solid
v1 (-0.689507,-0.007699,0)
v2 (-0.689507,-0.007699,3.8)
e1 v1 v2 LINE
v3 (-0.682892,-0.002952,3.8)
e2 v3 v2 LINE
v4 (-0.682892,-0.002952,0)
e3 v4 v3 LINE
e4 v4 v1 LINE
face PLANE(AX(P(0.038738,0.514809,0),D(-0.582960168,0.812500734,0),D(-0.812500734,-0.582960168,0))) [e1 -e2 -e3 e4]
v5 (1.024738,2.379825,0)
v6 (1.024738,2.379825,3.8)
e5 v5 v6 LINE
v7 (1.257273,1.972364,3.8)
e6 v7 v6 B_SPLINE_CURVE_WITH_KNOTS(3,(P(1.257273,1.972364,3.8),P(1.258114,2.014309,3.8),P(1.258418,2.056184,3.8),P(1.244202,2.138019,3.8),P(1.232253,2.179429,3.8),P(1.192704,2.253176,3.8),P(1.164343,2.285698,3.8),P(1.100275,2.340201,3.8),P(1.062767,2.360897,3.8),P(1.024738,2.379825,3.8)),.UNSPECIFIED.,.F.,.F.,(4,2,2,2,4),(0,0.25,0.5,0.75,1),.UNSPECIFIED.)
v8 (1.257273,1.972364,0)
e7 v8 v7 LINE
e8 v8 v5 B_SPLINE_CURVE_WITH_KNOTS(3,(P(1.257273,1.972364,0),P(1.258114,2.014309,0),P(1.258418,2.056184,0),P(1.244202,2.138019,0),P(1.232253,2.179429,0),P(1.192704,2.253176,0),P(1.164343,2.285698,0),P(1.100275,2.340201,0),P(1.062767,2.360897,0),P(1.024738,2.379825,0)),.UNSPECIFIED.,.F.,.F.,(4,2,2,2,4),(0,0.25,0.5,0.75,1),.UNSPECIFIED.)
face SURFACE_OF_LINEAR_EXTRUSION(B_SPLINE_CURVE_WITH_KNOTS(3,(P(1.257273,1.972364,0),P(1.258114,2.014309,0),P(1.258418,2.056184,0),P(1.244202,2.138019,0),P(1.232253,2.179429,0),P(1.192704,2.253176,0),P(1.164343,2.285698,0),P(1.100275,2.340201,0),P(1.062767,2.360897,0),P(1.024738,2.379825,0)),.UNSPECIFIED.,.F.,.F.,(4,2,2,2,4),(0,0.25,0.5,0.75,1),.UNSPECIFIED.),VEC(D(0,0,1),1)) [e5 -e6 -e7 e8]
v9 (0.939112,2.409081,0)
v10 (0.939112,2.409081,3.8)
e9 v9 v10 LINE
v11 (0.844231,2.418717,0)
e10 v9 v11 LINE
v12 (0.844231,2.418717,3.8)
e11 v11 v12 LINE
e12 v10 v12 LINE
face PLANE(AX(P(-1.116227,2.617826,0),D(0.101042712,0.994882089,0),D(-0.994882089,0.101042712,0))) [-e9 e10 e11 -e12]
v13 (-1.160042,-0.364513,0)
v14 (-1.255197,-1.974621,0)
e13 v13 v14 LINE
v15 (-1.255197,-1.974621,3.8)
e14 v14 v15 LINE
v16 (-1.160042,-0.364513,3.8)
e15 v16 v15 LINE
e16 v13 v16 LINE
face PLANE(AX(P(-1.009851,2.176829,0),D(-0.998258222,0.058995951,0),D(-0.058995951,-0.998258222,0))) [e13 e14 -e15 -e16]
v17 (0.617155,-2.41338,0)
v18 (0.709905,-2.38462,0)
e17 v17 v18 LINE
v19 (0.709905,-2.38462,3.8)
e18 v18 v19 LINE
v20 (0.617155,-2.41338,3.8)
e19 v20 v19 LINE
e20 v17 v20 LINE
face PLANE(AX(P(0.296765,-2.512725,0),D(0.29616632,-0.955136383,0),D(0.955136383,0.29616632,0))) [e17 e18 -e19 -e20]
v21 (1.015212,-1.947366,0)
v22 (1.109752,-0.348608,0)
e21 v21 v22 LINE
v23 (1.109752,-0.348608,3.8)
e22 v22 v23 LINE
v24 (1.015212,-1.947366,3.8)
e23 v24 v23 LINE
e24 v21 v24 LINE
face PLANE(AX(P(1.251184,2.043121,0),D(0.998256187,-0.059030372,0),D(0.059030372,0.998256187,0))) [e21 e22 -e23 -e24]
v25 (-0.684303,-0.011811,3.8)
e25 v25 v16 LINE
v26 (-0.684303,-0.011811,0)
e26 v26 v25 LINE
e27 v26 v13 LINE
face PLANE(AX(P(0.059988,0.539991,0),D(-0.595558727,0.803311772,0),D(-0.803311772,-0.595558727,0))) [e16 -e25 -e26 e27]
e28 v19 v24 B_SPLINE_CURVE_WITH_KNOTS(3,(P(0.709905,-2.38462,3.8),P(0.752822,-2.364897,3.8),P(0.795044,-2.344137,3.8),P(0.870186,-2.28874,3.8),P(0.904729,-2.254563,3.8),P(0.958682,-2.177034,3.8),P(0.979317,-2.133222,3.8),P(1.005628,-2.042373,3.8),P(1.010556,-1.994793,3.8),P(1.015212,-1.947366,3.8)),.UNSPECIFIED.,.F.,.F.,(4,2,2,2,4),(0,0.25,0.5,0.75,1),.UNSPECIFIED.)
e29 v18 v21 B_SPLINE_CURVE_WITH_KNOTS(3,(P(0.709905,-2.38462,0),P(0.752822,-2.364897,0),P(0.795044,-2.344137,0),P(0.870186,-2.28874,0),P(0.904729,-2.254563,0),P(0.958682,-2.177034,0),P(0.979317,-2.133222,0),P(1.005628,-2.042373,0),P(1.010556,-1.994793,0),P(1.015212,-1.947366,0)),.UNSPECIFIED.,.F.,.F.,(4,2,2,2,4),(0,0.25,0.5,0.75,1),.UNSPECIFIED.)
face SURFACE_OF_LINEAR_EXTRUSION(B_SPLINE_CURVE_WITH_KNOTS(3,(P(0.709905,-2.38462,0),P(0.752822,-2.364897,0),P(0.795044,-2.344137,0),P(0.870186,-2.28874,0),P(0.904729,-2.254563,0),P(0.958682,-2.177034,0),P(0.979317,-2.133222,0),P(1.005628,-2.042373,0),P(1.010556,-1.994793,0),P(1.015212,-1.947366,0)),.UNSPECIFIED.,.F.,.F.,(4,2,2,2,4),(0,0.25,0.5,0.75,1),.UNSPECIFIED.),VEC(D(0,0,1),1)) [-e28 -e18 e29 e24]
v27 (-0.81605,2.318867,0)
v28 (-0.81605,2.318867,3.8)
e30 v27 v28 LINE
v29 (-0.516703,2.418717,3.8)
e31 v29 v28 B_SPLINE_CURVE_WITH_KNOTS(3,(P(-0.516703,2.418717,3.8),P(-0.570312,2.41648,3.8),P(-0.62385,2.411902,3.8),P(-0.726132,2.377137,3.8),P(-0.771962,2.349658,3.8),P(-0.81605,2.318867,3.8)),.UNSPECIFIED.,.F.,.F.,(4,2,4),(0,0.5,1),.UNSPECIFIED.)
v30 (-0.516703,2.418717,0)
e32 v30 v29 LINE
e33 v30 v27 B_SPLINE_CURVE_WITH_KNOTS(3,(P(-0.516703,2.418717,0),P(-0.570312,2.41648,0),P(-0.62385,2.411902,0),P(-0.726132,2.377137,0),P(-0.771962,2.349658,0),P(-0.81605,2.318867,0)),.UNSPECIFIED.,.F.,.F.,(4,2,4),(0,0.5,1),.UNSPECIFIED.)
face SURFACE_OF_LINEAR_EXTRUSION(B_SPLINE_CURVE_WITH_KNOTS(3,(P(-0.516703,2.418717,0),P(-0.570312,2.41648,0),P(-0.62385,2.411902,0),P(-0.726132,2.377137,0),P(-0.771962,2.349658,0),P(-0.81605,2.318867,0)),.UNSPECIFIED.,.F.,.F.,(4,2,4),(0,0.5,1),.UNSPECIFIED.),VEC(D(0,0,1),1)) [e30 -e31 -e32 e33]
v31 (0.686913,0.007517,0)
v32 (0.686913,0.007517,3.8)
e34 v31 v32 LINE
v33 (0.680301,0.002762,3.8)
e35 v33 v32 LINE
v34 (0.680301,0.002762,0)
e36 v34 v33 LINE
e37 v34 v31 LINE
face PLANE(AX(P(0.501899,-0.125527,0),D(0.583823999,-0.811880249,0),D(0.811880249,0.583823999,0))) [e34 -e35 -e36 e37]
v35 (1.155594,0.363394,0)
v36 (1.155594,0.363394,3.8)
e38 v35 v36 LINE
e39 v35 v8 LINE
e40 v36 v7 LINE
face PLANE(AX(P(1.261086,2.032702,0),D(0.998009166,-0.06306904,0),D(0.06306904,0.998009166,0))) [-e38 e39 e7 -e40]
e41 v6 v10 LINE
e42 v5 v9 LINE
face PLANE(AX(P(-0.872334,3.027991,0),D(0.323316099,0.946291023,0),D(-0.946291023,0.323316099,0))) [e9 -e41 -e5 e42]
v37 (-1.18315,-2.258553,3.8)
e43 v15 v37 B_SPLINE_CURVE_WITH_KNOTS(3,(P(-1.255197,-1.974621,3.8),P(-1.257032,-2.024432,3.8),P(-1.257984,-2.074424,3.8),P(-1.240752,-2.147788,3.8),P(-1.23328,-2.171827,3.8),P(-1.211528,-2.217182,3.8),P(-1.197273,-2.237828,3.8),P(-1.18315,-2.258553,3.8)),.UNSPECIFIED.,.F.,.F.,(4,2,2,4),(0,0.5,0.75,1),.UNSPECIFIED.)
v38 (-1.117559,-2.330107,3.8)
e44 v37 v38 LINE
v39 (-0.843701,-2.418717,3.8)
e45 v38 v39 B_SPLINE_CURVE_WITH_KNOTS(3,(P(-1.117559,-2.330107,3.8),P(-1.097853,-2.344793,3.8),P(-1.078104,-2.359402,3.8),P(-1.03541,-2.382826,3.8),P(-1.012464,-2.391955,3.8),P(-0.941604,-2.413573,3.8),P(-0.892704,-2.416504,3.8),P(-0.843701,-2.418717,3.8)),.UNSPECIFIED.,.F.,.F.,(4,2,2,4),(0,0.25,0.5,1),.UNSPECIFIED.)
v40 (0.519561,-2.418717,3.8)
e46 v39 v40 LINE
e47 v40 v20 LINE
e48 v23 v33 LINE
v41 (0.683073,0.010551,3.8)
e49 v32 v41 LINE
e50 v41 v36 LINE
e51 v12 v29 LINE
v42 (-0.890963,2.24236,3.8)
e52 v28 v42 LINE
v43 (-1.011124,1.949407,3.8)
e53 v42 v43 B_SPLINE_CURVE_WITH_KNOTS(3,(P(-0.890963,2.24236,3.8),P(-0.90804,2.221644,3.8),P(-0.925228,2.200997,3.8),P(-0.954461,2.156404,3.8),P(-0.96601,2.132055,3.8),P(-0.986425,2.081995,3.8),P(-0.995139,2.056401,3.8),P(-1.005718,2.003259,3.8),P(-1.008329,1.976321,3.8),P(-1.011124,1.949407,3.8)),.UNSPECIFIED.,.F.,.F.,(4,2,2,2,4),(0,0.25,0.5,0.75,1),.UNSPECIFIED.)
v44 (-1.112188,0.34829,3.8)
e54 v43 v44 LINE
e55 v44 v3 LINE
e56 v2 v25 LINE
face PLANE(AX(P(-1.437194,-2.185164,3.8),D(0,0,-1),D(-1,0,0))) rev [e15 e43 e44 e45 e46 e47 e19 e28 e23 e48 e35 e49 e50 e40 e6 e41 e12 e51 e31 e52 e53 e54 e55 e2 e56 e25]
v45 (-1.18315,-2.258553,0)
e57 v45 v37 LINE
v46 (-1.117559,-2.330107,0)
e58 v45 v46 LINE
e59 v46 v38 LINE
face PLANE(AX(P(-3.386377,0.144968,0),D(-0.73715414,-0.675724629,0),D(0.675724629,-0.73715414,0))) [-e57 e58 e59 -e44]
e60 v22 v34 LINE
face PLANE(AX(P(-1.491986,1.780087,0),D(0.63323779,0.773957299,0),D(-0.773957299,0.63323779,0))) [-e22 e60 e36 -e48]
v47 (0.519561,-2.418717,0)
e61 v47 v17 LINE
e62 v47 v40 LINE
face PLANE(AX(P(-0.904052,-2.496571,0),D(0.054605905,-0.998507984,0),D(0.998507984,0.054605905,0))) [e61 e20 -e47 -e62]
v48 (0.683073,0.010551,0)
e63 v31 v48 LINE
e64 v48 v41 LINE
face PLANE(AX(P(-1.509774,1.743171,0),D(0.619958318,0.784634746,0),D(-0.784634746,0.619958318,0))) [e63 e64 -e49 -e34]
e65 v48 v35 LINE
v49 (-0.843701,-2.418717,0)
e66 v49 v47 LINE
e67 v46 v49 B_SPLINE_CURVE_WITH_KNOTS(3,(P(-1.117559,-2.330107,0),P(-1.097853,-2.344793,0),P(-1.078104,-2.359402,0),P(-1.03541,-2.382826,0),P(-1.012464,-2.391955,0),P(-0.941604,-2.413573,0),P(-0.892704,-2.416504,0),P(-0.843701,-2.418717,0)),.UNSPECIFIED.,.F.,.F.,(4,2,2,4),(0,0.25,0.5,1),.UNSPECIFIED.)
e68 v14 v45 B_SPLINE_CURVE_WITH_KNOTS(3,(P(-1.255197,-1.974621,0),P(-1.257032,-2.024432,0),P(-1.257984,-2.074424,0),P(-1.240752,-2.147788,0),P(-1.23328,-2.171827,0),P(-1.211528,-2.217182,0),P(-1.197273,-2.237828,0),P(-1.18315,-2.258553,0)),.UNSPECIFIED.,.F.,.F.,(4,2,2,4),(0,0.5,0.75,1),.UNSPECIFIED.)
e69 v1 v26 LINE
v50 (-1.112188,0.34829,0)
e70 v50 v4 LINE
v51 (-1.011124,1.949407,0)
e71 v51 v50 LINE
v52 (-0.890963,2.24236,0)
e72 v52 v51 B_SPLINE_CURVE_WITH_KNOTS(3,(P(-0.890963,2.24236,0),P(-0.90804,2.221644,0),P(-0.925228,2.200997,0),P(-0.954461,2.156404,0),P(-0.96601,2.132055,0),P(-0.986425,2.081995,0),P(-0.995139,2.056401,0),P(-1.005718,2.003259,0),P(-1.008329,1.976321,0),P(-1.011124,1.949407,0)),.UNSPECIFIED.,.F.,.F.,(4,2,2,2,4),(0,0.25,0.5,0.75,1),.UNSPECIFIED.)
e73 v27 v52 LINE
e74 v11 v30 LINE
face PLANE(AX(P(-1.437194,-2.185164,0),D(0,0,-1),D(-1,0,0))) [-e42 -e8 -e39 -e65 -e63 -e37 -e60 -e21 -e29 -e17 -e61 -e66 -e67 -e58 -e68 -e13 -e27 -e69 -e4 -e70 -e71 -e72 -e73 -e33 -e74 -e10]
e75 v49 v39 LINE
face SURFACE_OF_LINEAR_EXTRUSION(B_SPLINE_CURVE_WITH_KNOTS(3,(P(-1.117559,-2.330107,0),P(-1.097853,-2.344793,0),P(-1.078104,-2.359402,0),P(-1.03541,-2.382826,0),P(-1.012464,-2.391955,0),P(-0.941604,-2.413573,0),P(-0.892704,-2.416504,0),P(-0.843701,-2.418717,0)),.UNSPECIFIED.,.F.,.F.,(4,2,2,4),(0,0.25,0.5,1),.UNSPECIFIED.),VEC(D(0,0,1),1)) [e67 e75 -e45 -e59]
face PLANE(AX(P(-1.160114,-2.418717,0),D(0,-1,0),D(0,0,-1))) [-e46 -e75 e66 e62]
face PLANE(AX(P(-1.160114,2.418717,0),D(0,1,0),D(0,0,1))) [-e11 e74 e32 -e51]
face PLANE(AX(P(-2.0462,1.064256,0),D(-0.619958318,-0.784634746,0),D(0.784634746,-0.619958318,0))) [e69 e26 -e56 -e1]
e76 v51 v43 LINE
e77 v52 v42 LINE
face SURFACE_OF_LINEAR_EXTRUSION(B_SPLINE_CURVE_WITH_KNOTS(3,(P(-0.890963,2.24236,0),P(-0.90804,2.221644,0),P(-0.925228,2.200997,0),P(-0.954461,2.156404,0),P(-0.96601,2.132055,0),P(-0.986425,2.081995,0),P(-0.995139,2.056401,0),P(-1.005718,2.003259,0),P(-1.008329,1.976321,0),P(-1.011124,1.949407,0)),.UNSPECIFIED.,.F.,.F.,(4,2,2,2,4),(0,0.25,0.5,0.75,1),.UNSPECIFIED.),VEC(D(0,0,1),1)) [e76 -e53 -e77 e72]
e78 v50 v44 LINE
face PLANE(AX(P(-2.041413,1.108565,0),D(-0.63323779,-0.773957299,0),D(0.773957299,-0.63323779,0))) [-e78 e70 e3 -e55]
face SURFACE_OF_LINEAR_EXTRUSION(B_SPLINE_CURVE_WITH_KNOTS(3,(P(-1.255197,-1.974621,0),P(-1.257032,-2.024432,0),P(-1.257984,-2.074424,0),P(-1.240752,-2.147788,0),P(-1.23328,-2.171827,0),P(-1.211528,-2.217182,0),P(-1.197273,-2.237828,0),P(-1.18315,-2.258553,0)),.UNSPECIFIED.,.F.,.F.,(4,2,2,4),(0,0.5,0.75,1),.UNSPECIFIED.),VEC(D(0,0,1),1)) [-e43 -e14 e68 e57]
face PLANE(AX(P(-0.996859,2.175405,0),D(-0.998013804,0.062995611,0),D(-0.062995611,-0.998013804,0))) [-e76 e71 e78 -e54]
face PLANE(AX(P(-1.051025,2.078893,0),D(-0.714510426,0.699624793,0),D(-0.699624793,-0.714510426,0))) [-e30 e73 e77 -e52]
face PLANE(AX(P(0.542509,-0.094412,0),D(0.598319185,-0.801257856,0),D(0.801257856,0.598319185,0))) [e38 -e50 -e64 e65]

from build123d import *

# Parameters (mm, degrees)
EXTRUDE_1_DEPTH     = 3.8
CUT_EXTRUDE_START   = -3.8
CUT_EXTRUDE_1_DEPTH = 3.8


# Read off the part's stored shape, not the designer's step: Вырез-Вытянуть-Тонкостенный1
with BuildPart() as part:
    # Эскиз1 → Бобышка-Вытянуть1 (new body)
    with BuildSketch(Plane.XY):
        with BuildLine():
            Line((-1.318255437, 0.258478546), (-1.011455473, 0.007460394))
            Line((-1.011455473, 0.007460394), (-1.021853397, 0))
            Line((-1.021853397, 0), (-1.013303446, -0.006755517))
            Line((-1.013303446, -0.006755517), (-1.354182957, -0.259476533))
            Line((-1.354182957, -0.259476533), (-1.45497961, -1.965035745))
            add(Edge.make_bspline(
                [(-1.45497961, -1.965035745), (-1.45640581, -2.003703184), (-1.459192354, -2.079252548), (-1.439195647, -2.189444213), (-1.401920385, -2.293069865), (-1.360887275, -2.352996026), (-1.340211143, -2.383192158)],
                knots=[0, 0, 0, 0, 0.261167497, 0.510275296, 0.753233117, 1, 1, 1, 1], degree=3))
            Line((-1.340211143, -2.383192158), (-1.252388317, -2.478998878))
            add(Edge.make_bspline(
                [(-1.252388317, -2.478998878), (-1.223826424, -2.500445794), (-1.166852504, -2.543227091), (-1.067916042, -2.587045412), (-0.960717691, -2.613654188), (-0.886287022, -2.617003366), (-0.848203717, -2.618717012)],
                knots=[0, 0, 0, 0, 0.244974936, 0.488664468, 0.738369311, 1, 1, 1, 1], degree=3))
            Line((-0.848203717, -2.618717012), (0.525025935, -2.618717012))
            Line((0.525025935, -2.618717012), (0.652768229, -2.611731105))
            Line((0.652768229, -2.611731105), (0.781508508, -2.571811638))
            add(Edge.make_bspline(
                [(0.781508508, -2.571811638), (0.81386736, -2.556985687), (0.876622239, -2.528233099), (0.961545196, -2.472745684), (1.034068666, -2.408414236), (1.094840874, -2.335847946), (1.143241075, -2.25453384), (1.180521537, -2.165328685), (1.204445871, -2.066917619), (1.211164024, -1.998424391), (1.214634721, -1.963039772)],
                knots=[0, 0, 0, 0, 0.134662333, 0.261156306, 0.382520903, 0.500597599, 0.618135375, 0.739565345, 0.865455585, 1, 1, 1, 1], degree=3))
            Line((1.214634721, -1.963039772), (1.315431375, -0.258478546))
            Line((1.315431375, -0.258478546), (1.008642316, -0.007469317))
            Line((1.008642316, -0.007469317), (1.019029335, 0))
            Line((1.019029335, 0), (1.011344624, 0.00607187))
            Line((1.011344624, 0.00607187), (1.349362921, 0.258478546))
            Line((1.349362921, 0.258478546), (1.457145481, 1.964037759))
            add(Edge.make_bspline(
                [(1.457145481, 1.964037759), (1.457845677, 1.998685903), (1.459192354, 2.065324146), (1.444437242, 2.161701489), (1.419031977, 2.250026835), (1.380625008, 2.33058564), (1.328848362, 2.402161133), (1.265007239, 2.465541592), (1.189193466, 2.521537566), (1.13164527, 2.550062936), (1.101862228, 2.564825732)],
                knots=[0, 0, 0, 0, 0.13890651, 0.267156752, 0.389710114, 0.50679238, 0.623546631, 0.742540539, 0.866756453, 1, 1, 1, 1], degree=3))
            Line((1.101862228, 2.564825732), (0.982103828, 2.605743185))
            Line((0.982103828, 2.605743185), (0.854361535, 2.618717012))
            Line((0.854361535, 2.618717012), (-0.520864091, 2.618717012))
            add(Edge.make_bspline(
                [(-0.520864091, 2.618717012), (-0.559305217, 2.617118453), (-0.635572979, 2.613946891), (-0.746172278, 2.584611695), (-0.851357794, 2.538485458), (-0.914071086, 2.494441407), (-0.94600641, 2.472012972)],
                knots=[0, 0, 0, 0, 0.25146882, 0.498917843, 0.744835256, 1, 1, 1, 1], degree=3))
            Line((-0.94600641, 2.472012972), (-1.039817157, 2.376206252))
            add(Edge.make_bspline(
                [(-1.039817157, 2.376206252), (-1.064380545, 2.346448217), (-1.112795808, 2.28779413), (-1.162709181, 2.185792002), (-1.198785119, 2.078732957), (-1.206544744, 2.003910758), (-1.210472877, 1.966033732)],
                knots=[0, 0, 0, 0, 0.25502293, 0.502658773, 0.748232386, 1, 1, 1, 1], degree=3))
            Line((-1.210472877, 1.966033732), (-1.318255437, 0.258478546))
        make_face()
    extrude(amount=EXTRUDE_1_DEPTH)

    # Вырез-Вытянуть-Тонкостенный1 outline → Вырез-Вытянуть-Тонкостенный1 (cut)
    with BuildSketch(Plane.XY.offset(3.8).offset(CUT_EXTRUDE_START)):
        with BuildLine():
            Line((-1.354182957, -0.259476533), (-1.45497961, -1.965035745))
            add(Edge.make_bspline(
                [(-1.45497961, -1.965035745), (-1.45640581, -2.003703184), (-1.459192354, -2.079252548), (-1.439195647, -2.189444213), (-1.401920385, -2.293069865), (-1.360887275, -2.352996026), (-1.340211143, -2.383192158)],
                knots=[0, 0, 0, 0, 0.261167497, 0.510275296, 0.753233117, 1, 1, 1, 1], degree=3))
            Line((-1.340211143, -2.383192158), (-1.252388317, -2.478998878))
            add(Edge.make_bspline(
                [(-1.252388317, -2.478998878), (-1.223826424, -2.500445794), (-1.166852504, -2.543227091), (-1.067916042, -2.587045412), (-0.960717691, -2.613654188), (-0.886287022, -2.617003366), (-0.848203717, -2.618717012)],
                knots=[0, 0, 0, 0, 0.244974936, 0.488664468, 0.738369311, 1, 1, 1, 1], degree=3))
            Line((-0.848203717, -2.618717012), (0.525025935, -2.618717012))
            Line((0.525025935, -2.618717012), (0.652768229, -2.611731105))
            Line((0.652768229, -2.611731105), (0.781508508, -2.571811638))
            add(Edge.make_bspline(
                [(0.781508508, -2.571811638), (0.81386736, -2.556985687), (0.876622239, -2.528233099), (0.961545196, -2.472745684), (1.034068666, -2.408414236), (1.094840874, -2.335847946), (1.143241075, -2.25453384), (1.180521537, -2.165328685), (1.204445871, -2.066917619), (1.211164024, -1.998424391), (1.214634721, -1.963039772)],
                knots=[0, 0, 0, 0, 0.134662333, 0.261156306, 0.382520903, 0.500597599, 0.618135375, 0.739565345, 0.865455585, 1, 1, 1, 1], degree=3))
            Line((1.214634721, -1.963039772), (1.315431375, -0.258478546))
            Line((1.315431375, -0.258478546), (1.008642316, -0.007469317))
            Line((1.008642316, -0.007469317), (1.019029335, 0))
            Line((1.019029335, 0), (1.011344624, 0.00607187))
            Line((1.011344624, 0.00607187), (1.349362921, 0.258478546))
            Line((1.349362921, 0.258478546), (1.457145481, 1.964037759))
            add(Edge.make_bspline(
                [(1.457145481, 1.964037759), (1.457845677, 1.998685903), (1.459192354, 2.065324146), (1.444437242, 2.161701489), (1.419031977, 2.250026835), (1.380625008, 2.33058564), (1.328848362, 2.402161133), (1.265007239, 2.465541592), (1.189193466, 2.521537566), (1.13164527, 2.550062936), (1.101862228, 2.564825732)],
                knots=[0, 0, 0, 0, 0.13890651, 0.267156752, 0.389710114, 0.50679238, 0.623546631, 0.742540539, 0.866756453, 1, 1, 1, 1], degree=3))
            Line((1.101862228, 2.564825732), (0.982103828, 2.605743185))
            Line((0.982103828, 2.605743185), (0.854361535, 2.618717012))
            Line((0.854361535, 2.618717012), (-0.520864091, 2.618717012))
            add(Edge.make_bspline(
                [(-0.520864091, 2.618717012), (-0.559305217, 2.617118453), (-0.635572979, 2.613946891), (-0.746172278, 2.584611695), (-0.851357794, 2.538485458), (-0.914071086, 2.494441407), (-0.94600641, 2.472012972)],
                knots=[0, 0, 0, 0, 0.25146882, 0.498917843, 0.744835256, 1, 1, 1, 1], degree=3))
            Line((-0.94600641, 2.472012972), (-1.039817157, 2.376206252))
            add(Edge.make_bspline(
                [(-1.039817157, 2.376206252), (-1.064380545, 2.346448217), (-1.112795808, 2.28779413), (-1.162709181, 2.185792002), (-1.198785119, 2.078732957), (-1.206544744, 2.003910758), (-1.210472877, 1.966033732)],
                knots=[0, 0, 0, 0, 0.25502293, 0.502658773, 0.748232386, 1, 1, 1, 1], degree=3))
            Line((-1.210472877, 1.966033732), (-1.318255437, 0.258478546))
            Line((-1.318255437, 0.258478546), (-1.011455473, 0.007460394))
            Line((-1.011455473, 0.007460394), (-1.021853397, 0))
            Line((-1.021853397, 0), (-1.013303446, -0.006755517))
            Line((-1.013303446, -0.006755517), (-1.354182957, -0.259476533))
        make_face()
        with BuildLine():
            add(Edge.make_bspline(
                [(-0.890962738, 2.242360272), (-0.908040345, 2.22164355), (-0.925227906, 2.200997417), (-0.954461408, 2.156404341), (-0.966010446, 2.132055229), (-0.986425308, 2.081995312), (-0.995138703, 2.056401241), (-1.005717533, 2.003259432), (-1.008329368, 1.976320811), (-1.011124321, 1.949407339)],
                knots=[0, 0, 0, 0, 0.25, 0.25, 0.5, 0.5, 0.75, 0.75, 1, 1, 1, 1], degree=3))
            Line((-0.890962738, 2.242360272), (-0.816049696, 2.318867208))
            add(Edge.make_bspline(
                [(-0.516702669, 2.418717012), (-0.570312193, 2.416479981), (-0.623850037, 2.411902324), (-0.726132173, 2.377137017), (-0.771962058, 2.349658076), (-0.816049696, 2.318867208)],
                knots=[0, 0, 0, 0, 0.5, 0.5, 1, 1, 1, 1], degree=3))
            Line((-0.516702669, 2.418717012), (0.844231341, 2.418717012))
            Line((0.844231341, 2.418717012), (0.939111557, 2.40908074))
            Line((0.939111557, 2.40908074), (1.024738311, 2.379824932))
            add(Edge.make_bspline(
                [(1.257272687, 1.97236386), (1.258113876, 2.01430851), (1.258417785, 2.056183749), (1.244201982, 2.13801917), (1.232253283, 2.179429486), (1.19270388, 2.253176423), (1.164342715, 2.285697526), (1.100274837, 2.340200553), (1.062767239, 2.360897114), (1.024738311, 2.379824932)],
                knots=[0, 0, 0, 0, 0.25, 0.25, 0.5, 0.5, 0.75, 0.75, 1, 1, 1, 1], degree=3))
            Line((1.257272687, 1.97236386), (1.155594081, 0.363394067))
            Line((1.155594081, 0.363394067), (0.683073322, 0.010551055))
            Line((0.683073322, 0.010551055), (0.686913475, 0.00751686))
            Line((0.686913475, 0.00751686), (0.680300718, 0.00276162))
            Line((0.680300718, 0.00276162), (1.10975234, -0.348607889))
            Line((1.10975234, -0.348607889), (1.015212194, -1.947366014))
            add(Edge.make_bspline(
                [(0.709904759, -2.384620171), (0.75282168, -2.364896626), (0.795043999, -2.344136949), (0.870185675, -2.288740437), (0.904729386, -2.254562712), (0.958681636, -2.177034249), (0.979317247, -2.133222239), (1.00562776, -2.042372937), (1.01055567, -1.994793275), (1.015212194, -1.947366014)],
                knots=[0, 0, 0, 0, 0.25, 0.25, 0.5, 0.5, 0.75, 0.75, 1, 1, 1, 1], degree=3))
            Line((0.709904759, -2.384620171), (0.617154733, -2.413379869))
            Line((0.617154733, -2.413379869), (0.519561268, -2.418717012))
            Line((0.519561268, -2.418717012), (-0.843701007, -2.418717012))
            add(Edge.make_bspline(
                [(-1.117559098, -2.330106742), (-1.09785274, -2.344792791), (-1.078103779, -2.359401604), (-1.035410075, -2.382825575), (-1.012463689, -2.391955237), (-0.941603834, -2.413573455), (-0.892704311, -2.416504219), (-0.843701007, -2.418717012)],
                knots=[0, 0, 0, 0, 0.25, 0.25, 0.5, 0.5, 1, 1, 1, 1], degree=3))
            Line((-1.117559098, -2.330106742), (-1.183149998, -2.258553033))
            add(Edge.make_bspline(
                [(-1.255197127, -1.974621043), (-1.257032309, -2.024431579), (-1.257983846, -2.074423596), (-1.240751527, -2.14778759), (-1.233280402, -2.171827335), (-1.211527999, -2.217181786), (-1.197272925, -2.237827687), (-1.183149998, -2.258553033)],
                knots=[0, 0, 0, 0, 0.5, 0.5, 0.75, 0.75, 1, 1, 1, 1], degree=3))
            Line((-1.255197127, -1.974621043), (-1.160041559, -0.364513455))
            Line((-1.160041559, -0.364513455), (-0.684303055, -0.011810772))
            Line((-0.684303055, -0.011810772), (-0.689507135, -0.007698907))
            Line((-0.689507135, -0.007698907), (-0.682891645, -0.002952367))
            Line((-0.682891645, -0.002952367), (-1.112188393, 0.348290427))
            Line((-1.112188393, 0.348290427), (-1.011124321, 1.949407339))
        make_face(mode=Mode.SUBTRACT)
    extrude(amount=CUT_EXTRUDE_1_DEPTH, mode=Mode.SUBTRACT)


solid = part.part
